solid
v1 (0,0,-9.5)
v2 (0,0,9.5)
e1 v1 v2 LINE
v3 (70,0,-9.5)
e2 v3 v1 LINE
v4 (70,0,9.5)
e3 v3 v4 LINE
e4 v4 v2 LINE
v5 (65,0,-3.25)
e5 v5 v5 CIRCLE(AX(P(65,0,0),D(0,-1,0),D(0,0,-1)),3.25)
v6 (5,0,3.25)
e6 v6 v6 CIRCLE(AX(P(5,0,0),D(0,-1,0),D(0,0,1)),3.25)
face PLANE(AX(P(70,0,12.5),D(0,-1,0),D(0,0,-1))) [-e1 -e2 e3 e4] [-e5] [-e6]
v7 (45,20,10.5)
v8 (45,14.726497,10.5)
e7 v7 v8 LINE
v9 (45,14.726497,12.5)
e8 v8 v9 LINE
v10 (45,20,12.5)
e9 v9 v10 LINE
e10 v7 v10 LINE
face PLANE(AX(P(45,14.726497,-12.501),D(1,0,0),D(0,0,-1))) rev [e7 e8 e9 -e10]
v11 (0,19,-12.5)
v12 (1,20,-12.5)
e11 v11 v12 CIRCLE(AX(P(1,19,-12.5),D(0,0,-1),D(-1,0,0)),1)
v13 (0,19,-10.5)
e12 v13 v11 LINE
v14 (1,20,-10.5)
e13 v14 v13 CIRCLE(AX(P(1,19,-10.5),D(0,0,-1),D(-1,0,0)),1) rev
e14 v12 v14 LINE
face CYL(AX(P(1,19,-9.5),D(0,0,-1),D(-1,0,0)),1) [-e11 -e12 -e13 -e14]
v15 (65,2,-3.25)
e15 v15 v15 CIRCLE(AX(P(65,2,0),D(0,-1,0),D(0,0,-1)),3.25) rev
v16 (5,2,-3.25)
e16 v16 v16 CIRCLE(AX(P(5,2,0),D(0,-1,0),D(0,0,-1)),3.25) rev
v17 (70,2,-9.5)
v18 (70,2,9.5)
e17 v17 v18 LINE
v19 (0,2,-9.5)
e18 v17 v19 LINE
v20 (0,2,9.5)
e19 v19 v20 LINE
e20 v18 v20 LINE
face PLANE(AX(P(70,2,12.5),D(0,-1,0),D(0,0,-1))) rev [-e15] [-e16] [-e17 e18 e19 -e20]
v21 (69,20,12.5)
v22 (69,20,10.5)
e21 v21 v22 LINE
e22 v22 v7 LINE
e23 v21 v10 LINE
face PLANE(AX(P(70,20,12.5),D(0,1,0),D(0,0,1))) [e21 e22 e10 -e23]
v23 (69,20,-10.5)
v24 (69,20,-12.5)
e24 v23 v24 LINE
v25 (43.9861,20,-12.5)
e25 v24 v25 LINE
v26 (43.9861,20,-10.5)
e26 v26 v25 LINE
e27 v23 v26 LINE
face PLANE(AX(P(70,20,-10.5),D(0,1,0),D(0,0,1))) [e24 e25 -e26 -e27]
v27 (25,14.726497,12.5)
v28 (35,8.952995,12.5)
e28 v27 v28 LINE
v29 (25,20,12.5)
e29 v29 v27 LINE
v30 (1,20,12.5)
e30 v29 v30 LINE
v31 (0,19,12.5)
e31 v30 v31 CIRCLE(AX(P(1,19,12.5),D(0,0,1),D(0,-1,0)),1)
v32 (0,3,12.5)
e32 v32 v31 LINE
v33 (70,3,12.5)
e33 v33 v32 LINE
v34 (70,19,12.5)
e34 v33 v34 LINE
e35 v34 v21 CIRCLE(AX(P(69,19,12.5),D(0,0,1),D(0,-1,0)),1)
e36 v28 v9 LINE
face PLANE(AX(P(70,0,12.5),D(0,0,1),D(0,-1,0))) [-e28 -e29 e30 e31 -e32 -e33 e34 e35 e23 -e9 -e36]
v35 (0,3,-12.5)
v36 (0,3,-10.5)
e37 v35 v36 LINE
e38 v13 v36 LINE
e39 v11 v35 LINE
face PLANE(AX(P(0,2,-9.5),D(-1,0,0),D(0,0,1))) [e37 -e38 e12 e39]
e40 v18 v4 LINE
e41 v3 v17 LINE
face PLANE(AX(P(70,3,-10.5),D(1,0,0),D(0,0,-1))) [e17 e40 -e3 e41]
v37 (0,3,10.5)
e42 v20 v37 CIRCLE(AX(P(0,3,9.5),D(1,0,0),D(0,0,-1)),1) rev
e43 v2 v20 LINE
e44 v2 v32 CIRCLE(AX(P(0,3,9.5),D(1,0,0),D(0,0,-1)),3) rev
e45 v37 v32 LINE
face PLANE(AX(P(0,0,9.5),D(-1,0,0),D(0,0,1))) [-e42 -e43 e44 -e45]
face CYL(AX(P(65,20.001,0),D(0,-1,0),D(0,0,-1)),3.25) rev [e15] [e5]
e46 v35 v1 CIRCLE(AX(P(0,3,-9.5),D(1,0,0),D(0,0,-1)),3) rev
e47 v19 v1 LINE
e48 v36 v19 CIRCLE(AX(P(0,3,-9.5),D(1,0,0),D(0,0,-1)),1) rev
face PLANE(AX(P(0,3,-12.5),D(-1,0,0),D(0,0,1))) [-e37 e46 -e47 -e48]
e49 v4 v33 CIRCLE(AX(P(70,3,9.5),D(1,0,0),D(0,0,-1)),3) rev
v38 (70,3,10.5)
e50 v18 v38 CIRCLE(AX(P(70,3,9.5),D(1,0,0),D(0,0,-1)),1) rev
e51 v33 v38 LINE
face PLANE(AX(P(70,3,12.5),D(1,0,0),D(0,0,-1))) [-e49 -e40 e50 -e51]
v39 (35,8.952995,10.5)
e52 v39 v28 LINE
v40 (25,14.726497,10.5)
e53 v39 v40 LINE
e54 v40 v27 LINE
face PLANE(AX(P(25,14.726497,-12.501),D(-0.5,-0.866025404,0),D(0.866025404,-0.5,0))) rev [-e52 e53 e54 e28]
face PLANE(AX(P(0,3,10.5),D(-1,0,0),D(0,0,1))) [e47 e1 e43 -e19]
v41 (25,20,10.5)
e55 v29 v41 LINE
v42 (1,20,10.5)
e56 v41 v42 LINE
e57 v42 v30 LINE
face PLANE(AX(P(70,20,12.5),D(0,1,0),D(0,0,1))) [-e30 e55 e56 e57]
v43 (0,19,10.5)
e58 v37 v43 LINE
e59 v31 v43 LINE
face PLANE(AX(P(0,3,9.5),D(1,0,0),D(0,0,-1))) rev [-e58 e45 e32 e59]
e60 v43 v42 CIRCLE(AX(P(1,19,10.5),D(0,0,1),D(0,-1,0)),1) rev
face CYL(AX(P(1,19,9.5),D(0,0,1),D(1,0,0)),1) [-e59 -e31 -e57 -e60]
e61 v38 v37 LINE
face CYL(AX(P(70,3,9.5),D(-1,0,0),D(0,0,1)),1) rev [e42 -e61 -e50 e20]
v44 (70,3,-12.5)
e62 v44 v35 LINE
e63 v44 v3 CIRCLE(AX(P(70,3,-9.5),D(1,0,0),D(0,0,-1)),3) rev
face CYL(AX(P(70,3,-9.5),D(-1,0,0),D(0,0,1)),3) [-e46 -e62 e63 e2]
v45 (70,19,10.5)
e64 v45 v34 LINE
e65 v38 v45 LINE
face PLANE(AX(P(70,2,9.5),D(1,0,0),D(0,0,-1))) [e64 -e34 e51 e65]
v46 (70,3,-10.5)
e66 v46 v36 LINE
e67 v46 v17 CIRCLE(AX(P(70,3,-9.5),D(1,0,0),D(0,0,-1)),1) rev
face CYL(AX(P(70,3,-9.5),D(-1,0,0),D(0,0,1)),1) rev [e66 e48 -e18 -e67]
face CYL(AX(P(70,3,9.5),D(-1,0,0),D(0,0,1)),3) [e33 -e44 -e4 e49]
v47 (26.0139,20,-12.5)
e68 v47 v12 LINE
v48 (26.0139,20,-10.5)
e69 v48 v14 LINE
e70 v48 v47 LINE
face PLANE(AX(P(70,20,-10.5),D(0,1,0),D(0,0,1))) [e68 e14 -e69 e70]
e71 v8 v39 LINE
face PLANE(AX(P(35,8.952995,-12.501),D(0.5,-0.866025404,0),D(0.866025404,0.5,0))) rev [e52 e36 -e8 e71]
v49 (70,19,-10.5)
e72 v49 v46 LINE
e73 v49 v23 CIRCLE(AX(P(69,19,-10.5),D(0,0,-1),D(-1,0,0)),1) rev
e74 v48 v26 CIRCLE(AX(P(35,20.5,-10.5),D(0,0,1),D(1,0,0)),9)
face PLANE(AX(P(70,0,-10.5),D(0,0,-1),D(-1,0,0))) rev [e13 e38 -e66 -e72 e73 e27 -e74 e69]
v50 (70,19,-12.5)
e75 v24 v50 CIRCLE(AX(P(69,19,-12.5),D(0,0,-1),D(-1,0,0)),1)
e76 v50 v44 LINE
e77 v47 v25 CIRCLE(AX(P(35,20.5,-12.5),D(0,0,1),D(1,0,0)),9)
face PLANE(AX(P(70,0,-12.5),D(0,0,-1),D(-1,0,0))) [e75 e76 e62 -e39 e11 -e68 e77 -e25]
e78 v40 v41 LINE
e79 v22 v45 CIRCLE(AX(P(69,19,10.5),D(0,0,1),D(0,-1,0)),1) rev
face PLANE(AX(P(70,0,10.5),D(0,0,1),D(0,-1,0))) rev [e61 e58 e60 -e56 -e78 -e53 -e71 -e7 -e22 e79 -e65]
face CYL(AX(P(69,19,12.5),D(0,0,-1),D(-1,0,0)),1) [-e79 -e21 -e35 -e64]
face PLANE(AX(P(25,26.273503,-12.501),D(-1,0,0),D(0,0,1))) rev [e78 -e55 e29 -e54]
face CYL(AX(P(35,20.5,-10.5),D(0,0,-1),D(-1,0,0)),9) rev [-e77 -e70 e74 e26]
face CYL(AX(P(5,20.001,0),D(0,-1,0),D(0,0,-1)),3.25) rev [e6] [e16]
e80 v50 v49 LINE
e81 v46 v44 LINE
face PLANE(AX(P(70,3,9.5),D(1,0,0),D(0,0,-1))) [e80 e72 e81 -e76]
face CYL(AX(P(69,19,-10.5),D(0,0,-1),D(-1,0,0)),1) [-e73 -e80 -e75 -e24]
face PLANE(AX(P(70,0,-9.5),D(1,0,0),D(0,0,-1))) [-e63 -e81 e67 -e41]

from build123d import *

# Parameters (mm, degrees)
BASE_FLANGE1_DEPTH = 70
CUT_EXTRUDE1_REACH = 78.974
CUT_EXTRUDE2_REACH = 78.348
SKETCH7_R          = 9
CUT_EXTRUDE3_REACH = 75.866
SKETCH8_R          = 3.25
FILLET1_R          = 1


# Sheet-metal steps are written as plain solids
with BuildPart() as part:
    # Sketch1 → Base-Flange1 (new body)
    with BuildSketch(Plane(origin=(0, 0, 0), x_dir=(0, 0, -1), z_dir=(1, 0, 0))):
        with BuildLine():
            Line((-12.5, 20), (-12.5, 3))
            ThreePointArc((-12.5, 3), (-11.621320344, 0.878679656), (-9.5, 0))
            Line((-9.5, 0), (9.5, 0))
            ThreePointArc((9.5, 0), (11.621320344, 0.878679656), (12.5, 3))
            Line((12.5, 3), (12.5, 20))
            Line((12.5, 20), (10.5, 20))
            Line((10.5, 20), (10.5, 3))
            ThreePointArc((10.5, 3), (10.207106781, 2.292893219), (9.5, 2))
            Line((9.5, 2), (-9.5, 2))
            ThreePointArc((-9.5, 2), (-10.207106781, 2.292893219), (-10.5, 3))
            Line((-10.5, 3), (-10.5, 20))
            Line((-10.5, 20), (-12.5, 20))
        make_face()
    extrude(amount=BASE_FLANGE1_DEPTH)

    # Sketch6 → Cut-Extrude1 (cut, up to next)
    with BuildSketch(Plane.XY.offset(12.5), mode=Mode.PRIVATE) as cut_extrude1_sk1:
        Polygon((35, 8.952994616), (45, 14.726497308), (45, 26.273502692), (35, 32.047005384), (25, 26.273502692), (25, 14.726497308), align=None)
    cut_extrude1_tool1 = extrude(cut_extrude1_sk1.sketch, amount=-CUT_EXTRUDE1_REACH, mode=Mode.PRIVATE) & part.part
    add(cut_extrude1_tool1.solids().sort_by_distance((35, 20.5, 12.5))[0], mode=Mode.SUBTRACT)

    # Sketch7 → Cut-Extrude2 (cut, up to next)
    with BuildSketch(Plane.XY.offset(-10.5), mode=Mode.PRIVATE) as cut_extrude2_sk1:
        with Locations((35, 20.5)):
            Circle(SKETCH7_R)
    cut_extrude2_tool1 = extrude(cut_extrude2_sk1.sketch, amount=-CUT_EXTRUDE2_REACH, mode=Mode.PRIVATE) & part.part
    add(cut_extrude2_tool1.solids().sort_by_distance((35, 20.5, -10.5))[0], mode=Mode.SUBTRACT)

    # Sketch8 → Cut-Extrude3 (cut, up to next)
    with BuildSketch(Plane.XZ, mode=Mode.PRIVATE) as cut_extrude3_sk1:
        with Locations(Location((65, 0, 0), (0, 0, 270))):
            Circle(SKETCH8_R)
    cut_extrude3_tool1 = extrude(cut_extrude3_sk1.sketch, amount=-CUT_EXTRUDE3_REACH, mode=Mode.PRIVATE) & part.part
    # Sketch8 → Cut-Extrude3 (cut, up to next)
    with BuildSketch(Plane.XZ, mode=Mode.PRIVATE) as cut_extrude3_sk2:
        with Locations(Location((5, 0, 0), (0, 0, 270))):
            Circle(SKETCH8_R)
    cut_extrude3_tool2 = extrude(cut_extrude3_sk2.sketch, amount=-CUT_EXTRUDE3_REACH, mode=Mode.PRIVATE) & part.part
    add(cut_extrude3_tool1.solids().sort_by_distance((65, 0, 0))[0], mode=Mode.SUBTRACT)
    add(cut_extrude3_tool2.solids().sort_by_distance((5, 0, 0))[0], mode=Mode.SUBTRACT)

    # Fillet1
    fillet1_edges = [part.edges().sort_by_distance(p)[0] for p in [
        (0, 20, -11.5),
        (0, 20, 11.5),
        (70, 20, -11.5),
        (70, 20, 11.5),
    ]]
    fillet(fillet1_edges, radius=FILLET1_R)


solid = part.part
